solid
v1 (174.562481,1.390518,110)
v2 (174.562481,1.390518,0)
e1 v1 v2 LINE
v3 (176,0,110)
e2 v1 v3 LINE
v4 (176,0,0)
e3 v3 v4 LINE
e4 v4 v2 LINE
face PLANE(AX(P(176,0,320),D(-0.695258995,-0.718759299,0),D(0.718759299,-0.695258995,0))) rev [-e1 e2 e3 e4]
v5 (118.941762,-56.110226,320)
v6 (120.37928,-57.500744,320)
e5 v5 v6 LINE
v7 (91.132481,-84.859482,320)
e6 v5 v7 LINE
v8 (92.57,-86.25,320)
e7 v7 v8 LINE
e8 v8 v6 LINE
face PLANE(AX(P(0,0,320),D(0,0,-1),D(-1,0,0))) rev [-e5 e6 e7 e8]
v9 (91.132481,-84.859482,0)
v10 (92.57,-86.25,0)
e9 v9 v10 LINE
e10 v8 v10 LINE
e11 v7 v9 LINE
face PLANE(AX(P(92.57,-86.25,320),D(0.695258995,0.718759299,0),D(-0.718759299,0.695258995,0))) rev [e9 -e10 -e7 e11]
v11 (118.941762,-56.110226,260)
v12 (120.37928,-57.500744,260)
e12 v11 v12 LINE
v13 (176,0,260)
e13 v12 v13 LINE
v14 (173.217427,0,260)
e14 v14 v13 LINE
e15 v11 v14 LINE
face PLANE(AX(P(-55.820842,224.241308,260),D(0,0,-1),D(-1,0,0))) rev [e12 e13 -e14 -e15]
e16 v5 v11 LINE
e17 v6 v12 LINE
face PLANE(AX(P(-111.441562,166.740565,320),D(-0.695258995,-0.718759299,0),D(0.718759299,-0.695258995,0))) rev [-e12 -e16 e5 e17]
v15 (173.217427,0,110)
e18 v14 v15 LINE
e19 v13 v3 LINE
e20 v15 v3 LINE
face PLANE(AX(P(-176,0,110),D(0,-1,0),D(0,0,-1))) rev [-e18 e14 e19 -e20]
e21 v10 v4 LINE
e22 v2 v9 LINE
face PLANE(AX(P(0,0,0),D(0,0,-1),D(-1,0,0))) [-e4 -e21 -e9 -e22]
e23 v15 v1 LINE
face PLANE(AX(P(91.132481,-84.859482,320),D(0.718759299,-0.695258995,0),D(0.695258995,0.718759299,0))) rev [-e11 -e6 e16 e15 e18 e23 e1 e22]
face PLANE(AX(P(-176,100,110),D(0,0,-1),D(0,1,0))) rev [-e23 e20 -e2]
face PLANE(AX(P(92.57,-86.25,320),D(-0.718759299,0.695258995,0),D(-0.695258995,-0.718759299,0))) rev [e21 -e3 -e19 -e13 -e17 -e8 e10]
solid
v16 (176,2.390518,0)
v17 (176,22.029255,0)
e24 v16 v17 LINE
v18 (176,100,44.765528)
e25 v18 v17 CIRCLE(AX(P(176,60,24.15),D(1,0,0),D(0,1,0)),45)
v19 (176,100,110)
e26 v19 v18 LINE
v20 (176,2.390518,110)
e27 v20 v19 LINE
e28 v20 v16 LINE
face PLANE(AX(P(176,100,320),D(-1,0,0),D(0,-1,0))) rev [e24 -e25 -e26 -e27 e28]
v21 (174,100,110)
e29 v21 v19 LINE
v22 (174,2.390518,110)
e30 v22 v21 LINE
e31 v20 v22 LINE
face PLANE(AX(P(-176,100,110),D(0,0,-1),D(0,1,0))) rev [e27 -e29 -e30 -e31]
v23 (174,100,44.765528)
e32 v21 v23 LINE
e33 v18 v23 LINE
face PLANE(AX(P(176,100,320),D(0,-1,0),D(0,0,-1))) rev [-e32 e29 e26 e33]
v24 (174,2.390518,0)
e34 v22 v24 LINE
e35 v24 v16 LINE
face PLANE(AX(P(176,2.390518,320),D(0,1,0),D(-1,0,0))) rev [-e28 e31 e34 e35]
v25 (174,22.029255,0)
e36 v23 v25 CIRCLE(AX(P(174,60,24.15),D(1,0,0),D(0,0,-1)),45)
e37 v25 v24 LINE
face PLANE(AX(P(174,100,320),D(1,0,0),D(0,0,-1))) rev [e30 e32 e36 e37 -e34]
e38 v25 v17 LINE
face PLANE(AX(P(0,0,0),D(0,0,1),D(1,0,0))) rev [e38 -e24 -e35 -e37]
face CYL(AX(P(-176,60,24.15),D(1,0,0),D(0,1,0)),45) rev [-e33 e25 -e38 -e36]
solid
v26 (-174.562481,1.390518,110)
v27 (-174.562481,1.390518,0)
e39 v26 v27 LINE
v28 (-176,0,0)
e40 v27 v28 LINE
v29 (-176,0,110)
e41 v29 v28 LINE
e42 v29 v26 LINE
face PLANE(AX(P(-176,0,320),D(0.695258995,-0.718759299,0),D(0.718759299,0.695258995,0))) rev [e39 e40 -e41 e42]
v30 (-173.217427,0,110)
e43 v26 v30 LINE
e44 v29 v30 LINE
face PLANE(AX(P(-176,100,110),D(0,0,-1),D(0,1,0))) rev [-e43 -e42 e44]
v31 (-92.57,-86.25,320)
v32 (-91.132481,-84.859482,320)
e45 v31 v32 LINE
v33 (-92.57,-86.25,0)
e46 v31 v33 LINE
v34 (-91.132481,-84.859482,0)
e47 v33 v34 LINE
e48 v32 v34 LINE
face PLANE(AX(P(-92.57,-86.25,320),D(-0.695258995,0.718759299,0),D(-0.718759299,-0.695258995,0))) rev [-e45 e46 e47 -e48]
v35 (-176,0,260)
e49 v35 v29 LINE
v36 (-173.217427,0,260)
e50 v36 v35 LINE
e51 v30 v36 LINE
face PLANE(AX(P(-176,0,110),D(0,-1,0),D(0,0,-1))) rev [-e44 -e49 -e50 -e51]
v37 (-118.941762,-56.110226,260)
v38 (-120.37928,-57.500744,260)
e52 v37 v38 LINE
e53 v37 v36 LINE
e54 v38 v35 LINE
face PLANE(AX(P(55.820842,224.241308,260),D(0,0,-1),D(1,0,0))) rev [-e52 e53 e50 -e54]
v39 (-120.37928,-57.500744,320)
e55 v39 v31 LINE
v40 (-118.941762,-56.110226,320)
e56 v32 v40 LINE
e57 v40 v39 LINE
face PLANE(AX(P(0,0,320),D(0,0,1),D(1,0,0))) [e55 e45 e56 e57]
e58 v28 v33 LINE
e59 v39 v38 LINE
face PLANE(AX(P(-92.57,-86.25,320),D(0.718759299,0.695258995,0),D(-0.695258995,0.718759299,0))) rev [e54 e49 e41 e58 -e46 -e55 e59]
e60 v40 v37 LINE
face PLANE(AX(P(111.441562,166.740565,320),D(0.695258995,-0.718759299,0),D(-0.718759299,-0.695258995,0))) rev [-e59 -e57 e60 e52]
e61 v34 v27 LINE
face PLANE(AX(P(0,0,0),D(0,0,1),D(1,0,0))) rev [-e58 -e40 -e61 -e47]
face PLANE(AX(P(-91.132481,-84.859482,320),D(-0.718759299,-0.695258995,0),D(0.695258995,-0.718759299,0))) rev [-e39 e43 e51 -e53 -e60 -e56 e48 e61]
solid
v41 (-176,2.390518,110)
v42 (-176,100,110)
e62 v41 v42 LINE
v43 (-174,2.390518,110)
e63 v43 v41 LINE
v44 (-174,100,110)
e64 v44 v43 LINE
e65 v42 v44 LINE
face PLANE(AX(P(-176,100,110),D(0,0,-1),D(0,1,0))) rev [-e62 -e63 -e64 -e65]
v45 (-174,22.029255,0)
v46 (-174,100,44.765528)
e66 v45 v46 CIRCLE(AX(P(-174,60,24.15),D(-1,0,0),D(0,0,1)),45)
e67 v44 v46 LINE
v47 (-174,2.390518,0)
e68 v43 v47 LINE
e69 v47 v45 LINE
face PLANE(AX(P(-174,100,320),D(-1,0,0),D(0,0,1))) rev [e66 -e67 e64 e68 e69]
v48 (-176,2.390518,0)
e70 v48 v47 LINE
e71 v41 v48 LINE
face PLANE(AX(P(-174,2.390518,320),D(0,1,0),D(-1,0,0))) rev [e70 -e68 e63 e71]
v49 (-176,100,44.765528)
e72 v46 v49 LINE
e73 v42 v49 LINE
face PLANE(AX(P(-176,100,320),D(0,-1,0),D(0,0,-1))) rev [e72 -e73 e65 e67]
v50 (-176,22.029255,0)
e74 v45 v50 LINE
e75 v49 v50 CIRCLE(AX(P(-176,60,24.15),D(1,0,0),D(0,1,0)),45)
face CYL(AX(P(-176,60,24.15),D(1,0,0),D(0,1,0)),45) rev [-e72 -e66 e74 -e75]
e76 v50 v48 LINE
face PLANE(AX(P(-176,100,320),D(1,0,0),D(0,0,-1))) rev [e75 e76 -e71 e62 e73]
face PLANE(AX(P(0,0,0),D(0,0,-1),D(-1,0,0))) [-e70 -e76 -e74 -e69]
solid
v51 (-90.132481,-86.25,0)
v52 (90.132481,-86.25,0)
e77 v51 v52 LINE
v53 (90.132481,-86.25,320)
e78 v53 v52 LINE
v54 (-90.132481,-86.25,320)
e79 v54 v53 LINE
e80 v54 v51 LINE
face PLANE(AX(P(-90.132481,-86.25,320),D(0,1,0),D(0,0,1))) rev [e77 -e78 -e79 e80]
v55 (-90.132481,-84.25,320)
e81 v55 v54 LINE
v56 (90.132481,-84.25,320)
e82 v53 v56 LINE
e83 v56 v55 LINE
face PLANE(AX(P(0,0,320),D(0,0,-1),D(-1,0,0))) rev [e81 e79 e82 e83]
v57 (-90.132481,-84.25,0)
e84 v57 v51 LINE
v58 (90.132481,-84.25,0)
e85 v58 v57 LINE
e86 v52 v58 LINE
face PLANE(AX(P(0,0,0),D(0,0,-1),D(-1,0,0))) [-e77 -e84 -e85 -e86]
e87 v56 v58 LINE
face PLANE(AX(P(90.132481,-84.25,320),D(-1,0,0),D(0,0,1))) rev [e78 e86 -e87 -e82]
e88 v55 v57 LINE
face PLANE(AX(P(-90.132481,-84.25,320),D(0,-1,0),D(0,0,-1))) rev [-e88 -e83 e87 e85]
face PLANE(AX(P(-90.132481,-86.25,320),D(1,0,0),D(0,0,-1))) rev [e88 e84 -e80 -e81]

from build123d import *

# Parameters (mm, degrees)
BOSS_EXTRU_1_DEPTH           = 320
ESQUISSE2_W                  = 2
ESQUISSE2_H                  = 97.60948201
BOSS_EXTRU_1_2_DEPTH         = 320
BOSS_EXTRU_1_3_DEPTH         = 320
ESQUISSE2_W_2                = 180.264962804
ESQUISSE2_H_2                = 2
BOSS_EXTRU_1_4_DEPTH         = 320
BOSS_EXTRU_1_5_DEPTH         = 320
ENL_V_MAT_EXTRU_1_DEPTH      = 379.650234385
ENL_V_MAT_EXTRU_1_DEPTH_BACK = 379.650234385
ESQUISSE3_W                  = 210
ESQUISSE3_H                  = 100
ESQUISSE4_W                  = 60
ESQUISSE4_H                  = 80
ENL_V_MAT_EXTRU_2_DEPTH      = 458.137038923
ENL_V_START                  = -352
ENL_V_MAT_EXTRU_3_DEPTH      = 352


# Read off the part's stored shape, not the designer's step: Enlèv. mat.-Extru.3
with BuildPart() as part:
    # Esquisse2 → Boss.-Extru.1 (new body)
    with BuildSketch(Plane.XY):
        Polygon((-92.57, -86.25), (-176, 0), (-174.562481402, 1.39051799), (-91.132481402, -84.85948201), align=None)
    extrude(amount=BOSS_EXTRU_1_DEPTH)


with BuildPart() as body_2:
    # Esquisse2 → Boss.-Extru.1 2 (new body)
    with BuildSketch(Plane.XY):
        with Locations((-175, 51.195258995)):
            Rectangle(ESQUISSE2_W, ESQUISSE2_H)
    extrude(amount=BOSS_EXTRU_1_2_DEPTH)


with BuildPart() as body_3:
    # Esquisse2 → Boss.-Extru.1 3 (new body)
    with BuildSketch(Plane.XY):
        Polygon((92.57, -86.25), (176, 0), (174.562481402, 1.39051799), (91.132481402, -84.85948201), align=None)
    extrude(amount=BOSS_EXTRU_1_3_DEPTH)


with BuildPart() as body_4:
    # Esquisse2 → Boss.-Extru.1 4 (new body)
    with BuildSketch(Plane.XY):
        with Locations((0, -85.25)):
            Rectangle(ESQUISSE2_W_2, ESQUISSE2_H_2)
    extrude(amount=BOSS_EXTRU_1_4_DEPTH)


with BuildPart() as body_5:
    # Esquisse2 → Boss.-Extru.1 5 (new body)
    with BuildSketch(Plane.XY):
        with Locations((175, 51.195258995)):
            Rectangle(ESQUISSE2_W, ESQUISSE2_H)
    extrude(amount=BOSS_EXTRU_1_5_DEPTH)


with BuildPart() as enl_v_mat_extru_1_tool:
    # Esquisse3 → Enlèv. mat.-Extru.1 (new, two sides: drawn at the far end of the back side and taken through both)
    with BuildSketch(Plane(origin=(0, 0, 0), x_dir=(0, 0, -1), z_dir=(1, 0, 0)).offset(-ENL_V_MAT_EXTRU_1_DEPTH_BACK)):
        with Locations((-215, 50)):
            Rectangle(ESQUISSE3_W, ESQUISSE3_H)
    extrude(amount=ENL_V_MAT_EXTRU_1_DEPTH + ENL_V_MAT_EXTRU_1_DEPTH_BACK)


with BuildPart() as part_1:
    add(part.part)

    # Enlèv. mat.-Extru.1: cut by enl_v_mat_extru_1_tool
    add(enl_v_mat_extru_1_tool.part, mode=Mode.SUBTRACT)


with BuildPart() as body_2_1:
    add(body_2.part)

    # Enlèv. mat.-Extru.1: cut by enl_v_mat_extru_1_tool
    add(enl_v_mat_extru_1_tool.part, mode=Mode.SUBTRACT)


with BuildPart() as body_3_1:
    add(body_3.part)

    # Enlèv. mat.-Extru.1: cut by enl_v_mat_extru_1_tool
    add(enl_v_mat_extru_1_tool.part, mode=Mode.SUBTRACT)

    # Esquisse4 → Enlèv. mat.-Extru.2 (cut, symmetric)
    with BuildSketch(Plane(origin=(90.924227664, -87.951400742, 0), x_dir=(0, 0, -1), z_dir=(0.718759299008584, -0.6952589949714343, 0))):
        with Locations((-290, 82.365583115)):
            Rectangle(ESQUISSE4_W, ESQUISSE4_H)
    enl_v_mat_extru_2 = extrude(amount=ENL_V_MAT_EXTRU_2_DEPTH, both=True, mode=Mode.SUBTRACT)


with BuildPart() as body_5_1:
    add(body_5.part)

    # Enlèv. mat.-Extru.1: cut by enl_v_mat_extru_1_tool
    add(enl_v_mat_extru_1_tool.part, mode=Mode.SUBTRACT)


with BuildPart() as part_2:
    add(part_1.part)

    # Symétrie2: Enlèv. mat.-Extru.2 across plane
    add(enl_v_mat_extru_2.mirror(Plane(origin=(0, 0, 0), x_dir=(0, 0, 1), z_dir=(1, 0, 0))), mode=Mode.SUBTRACT)


with BuildPart() as enl_v_mat_extru_3_tool:
    # Enlèv. mat.-Extru.3 outline → Enlèv. mat.-Extru.3 (new body)
    with BuildSketch(Plane(origin=(176, 0, 0), x_dir=(0, 0, -1), z_dir=(1, 0, 0)).offset(ENL_V_START)):
        with BuildLine():
            Line((0, 100), (-44.765528128, 100))
            ThreePointArc((-44.765528128, 100), (-63.175407163, 37.594250832), (0, 22.029254682))
            Line((0, 22.029254682), (0, 100))
        make_face()
    extrude(amount=ENL_V_MAT_EXTRU_3_DEPTH)


with BuildPart() as body_2_2:
    add(body_2_1.part)

    # Enlèv. mat.-Extru.3: cut by enl_v_mat_extru_3_tool
    add(enl_v_mat_extru_3_tool.part, mode=Mode.SUBTRACT)


with BuildPart() as body_5_2:
    add(body_5_1.part)

    # Enlèv. mat.-Extru.3: cut by enl_v_mat_extru_3_tool
    add(enl_v_mat_extru_3_tool.part, mode=Mode.SUBTRACT)


solid = Compound([body_4.part, body_3_1.part, part_2.part, body_2_2.part, body_5_2.part])
